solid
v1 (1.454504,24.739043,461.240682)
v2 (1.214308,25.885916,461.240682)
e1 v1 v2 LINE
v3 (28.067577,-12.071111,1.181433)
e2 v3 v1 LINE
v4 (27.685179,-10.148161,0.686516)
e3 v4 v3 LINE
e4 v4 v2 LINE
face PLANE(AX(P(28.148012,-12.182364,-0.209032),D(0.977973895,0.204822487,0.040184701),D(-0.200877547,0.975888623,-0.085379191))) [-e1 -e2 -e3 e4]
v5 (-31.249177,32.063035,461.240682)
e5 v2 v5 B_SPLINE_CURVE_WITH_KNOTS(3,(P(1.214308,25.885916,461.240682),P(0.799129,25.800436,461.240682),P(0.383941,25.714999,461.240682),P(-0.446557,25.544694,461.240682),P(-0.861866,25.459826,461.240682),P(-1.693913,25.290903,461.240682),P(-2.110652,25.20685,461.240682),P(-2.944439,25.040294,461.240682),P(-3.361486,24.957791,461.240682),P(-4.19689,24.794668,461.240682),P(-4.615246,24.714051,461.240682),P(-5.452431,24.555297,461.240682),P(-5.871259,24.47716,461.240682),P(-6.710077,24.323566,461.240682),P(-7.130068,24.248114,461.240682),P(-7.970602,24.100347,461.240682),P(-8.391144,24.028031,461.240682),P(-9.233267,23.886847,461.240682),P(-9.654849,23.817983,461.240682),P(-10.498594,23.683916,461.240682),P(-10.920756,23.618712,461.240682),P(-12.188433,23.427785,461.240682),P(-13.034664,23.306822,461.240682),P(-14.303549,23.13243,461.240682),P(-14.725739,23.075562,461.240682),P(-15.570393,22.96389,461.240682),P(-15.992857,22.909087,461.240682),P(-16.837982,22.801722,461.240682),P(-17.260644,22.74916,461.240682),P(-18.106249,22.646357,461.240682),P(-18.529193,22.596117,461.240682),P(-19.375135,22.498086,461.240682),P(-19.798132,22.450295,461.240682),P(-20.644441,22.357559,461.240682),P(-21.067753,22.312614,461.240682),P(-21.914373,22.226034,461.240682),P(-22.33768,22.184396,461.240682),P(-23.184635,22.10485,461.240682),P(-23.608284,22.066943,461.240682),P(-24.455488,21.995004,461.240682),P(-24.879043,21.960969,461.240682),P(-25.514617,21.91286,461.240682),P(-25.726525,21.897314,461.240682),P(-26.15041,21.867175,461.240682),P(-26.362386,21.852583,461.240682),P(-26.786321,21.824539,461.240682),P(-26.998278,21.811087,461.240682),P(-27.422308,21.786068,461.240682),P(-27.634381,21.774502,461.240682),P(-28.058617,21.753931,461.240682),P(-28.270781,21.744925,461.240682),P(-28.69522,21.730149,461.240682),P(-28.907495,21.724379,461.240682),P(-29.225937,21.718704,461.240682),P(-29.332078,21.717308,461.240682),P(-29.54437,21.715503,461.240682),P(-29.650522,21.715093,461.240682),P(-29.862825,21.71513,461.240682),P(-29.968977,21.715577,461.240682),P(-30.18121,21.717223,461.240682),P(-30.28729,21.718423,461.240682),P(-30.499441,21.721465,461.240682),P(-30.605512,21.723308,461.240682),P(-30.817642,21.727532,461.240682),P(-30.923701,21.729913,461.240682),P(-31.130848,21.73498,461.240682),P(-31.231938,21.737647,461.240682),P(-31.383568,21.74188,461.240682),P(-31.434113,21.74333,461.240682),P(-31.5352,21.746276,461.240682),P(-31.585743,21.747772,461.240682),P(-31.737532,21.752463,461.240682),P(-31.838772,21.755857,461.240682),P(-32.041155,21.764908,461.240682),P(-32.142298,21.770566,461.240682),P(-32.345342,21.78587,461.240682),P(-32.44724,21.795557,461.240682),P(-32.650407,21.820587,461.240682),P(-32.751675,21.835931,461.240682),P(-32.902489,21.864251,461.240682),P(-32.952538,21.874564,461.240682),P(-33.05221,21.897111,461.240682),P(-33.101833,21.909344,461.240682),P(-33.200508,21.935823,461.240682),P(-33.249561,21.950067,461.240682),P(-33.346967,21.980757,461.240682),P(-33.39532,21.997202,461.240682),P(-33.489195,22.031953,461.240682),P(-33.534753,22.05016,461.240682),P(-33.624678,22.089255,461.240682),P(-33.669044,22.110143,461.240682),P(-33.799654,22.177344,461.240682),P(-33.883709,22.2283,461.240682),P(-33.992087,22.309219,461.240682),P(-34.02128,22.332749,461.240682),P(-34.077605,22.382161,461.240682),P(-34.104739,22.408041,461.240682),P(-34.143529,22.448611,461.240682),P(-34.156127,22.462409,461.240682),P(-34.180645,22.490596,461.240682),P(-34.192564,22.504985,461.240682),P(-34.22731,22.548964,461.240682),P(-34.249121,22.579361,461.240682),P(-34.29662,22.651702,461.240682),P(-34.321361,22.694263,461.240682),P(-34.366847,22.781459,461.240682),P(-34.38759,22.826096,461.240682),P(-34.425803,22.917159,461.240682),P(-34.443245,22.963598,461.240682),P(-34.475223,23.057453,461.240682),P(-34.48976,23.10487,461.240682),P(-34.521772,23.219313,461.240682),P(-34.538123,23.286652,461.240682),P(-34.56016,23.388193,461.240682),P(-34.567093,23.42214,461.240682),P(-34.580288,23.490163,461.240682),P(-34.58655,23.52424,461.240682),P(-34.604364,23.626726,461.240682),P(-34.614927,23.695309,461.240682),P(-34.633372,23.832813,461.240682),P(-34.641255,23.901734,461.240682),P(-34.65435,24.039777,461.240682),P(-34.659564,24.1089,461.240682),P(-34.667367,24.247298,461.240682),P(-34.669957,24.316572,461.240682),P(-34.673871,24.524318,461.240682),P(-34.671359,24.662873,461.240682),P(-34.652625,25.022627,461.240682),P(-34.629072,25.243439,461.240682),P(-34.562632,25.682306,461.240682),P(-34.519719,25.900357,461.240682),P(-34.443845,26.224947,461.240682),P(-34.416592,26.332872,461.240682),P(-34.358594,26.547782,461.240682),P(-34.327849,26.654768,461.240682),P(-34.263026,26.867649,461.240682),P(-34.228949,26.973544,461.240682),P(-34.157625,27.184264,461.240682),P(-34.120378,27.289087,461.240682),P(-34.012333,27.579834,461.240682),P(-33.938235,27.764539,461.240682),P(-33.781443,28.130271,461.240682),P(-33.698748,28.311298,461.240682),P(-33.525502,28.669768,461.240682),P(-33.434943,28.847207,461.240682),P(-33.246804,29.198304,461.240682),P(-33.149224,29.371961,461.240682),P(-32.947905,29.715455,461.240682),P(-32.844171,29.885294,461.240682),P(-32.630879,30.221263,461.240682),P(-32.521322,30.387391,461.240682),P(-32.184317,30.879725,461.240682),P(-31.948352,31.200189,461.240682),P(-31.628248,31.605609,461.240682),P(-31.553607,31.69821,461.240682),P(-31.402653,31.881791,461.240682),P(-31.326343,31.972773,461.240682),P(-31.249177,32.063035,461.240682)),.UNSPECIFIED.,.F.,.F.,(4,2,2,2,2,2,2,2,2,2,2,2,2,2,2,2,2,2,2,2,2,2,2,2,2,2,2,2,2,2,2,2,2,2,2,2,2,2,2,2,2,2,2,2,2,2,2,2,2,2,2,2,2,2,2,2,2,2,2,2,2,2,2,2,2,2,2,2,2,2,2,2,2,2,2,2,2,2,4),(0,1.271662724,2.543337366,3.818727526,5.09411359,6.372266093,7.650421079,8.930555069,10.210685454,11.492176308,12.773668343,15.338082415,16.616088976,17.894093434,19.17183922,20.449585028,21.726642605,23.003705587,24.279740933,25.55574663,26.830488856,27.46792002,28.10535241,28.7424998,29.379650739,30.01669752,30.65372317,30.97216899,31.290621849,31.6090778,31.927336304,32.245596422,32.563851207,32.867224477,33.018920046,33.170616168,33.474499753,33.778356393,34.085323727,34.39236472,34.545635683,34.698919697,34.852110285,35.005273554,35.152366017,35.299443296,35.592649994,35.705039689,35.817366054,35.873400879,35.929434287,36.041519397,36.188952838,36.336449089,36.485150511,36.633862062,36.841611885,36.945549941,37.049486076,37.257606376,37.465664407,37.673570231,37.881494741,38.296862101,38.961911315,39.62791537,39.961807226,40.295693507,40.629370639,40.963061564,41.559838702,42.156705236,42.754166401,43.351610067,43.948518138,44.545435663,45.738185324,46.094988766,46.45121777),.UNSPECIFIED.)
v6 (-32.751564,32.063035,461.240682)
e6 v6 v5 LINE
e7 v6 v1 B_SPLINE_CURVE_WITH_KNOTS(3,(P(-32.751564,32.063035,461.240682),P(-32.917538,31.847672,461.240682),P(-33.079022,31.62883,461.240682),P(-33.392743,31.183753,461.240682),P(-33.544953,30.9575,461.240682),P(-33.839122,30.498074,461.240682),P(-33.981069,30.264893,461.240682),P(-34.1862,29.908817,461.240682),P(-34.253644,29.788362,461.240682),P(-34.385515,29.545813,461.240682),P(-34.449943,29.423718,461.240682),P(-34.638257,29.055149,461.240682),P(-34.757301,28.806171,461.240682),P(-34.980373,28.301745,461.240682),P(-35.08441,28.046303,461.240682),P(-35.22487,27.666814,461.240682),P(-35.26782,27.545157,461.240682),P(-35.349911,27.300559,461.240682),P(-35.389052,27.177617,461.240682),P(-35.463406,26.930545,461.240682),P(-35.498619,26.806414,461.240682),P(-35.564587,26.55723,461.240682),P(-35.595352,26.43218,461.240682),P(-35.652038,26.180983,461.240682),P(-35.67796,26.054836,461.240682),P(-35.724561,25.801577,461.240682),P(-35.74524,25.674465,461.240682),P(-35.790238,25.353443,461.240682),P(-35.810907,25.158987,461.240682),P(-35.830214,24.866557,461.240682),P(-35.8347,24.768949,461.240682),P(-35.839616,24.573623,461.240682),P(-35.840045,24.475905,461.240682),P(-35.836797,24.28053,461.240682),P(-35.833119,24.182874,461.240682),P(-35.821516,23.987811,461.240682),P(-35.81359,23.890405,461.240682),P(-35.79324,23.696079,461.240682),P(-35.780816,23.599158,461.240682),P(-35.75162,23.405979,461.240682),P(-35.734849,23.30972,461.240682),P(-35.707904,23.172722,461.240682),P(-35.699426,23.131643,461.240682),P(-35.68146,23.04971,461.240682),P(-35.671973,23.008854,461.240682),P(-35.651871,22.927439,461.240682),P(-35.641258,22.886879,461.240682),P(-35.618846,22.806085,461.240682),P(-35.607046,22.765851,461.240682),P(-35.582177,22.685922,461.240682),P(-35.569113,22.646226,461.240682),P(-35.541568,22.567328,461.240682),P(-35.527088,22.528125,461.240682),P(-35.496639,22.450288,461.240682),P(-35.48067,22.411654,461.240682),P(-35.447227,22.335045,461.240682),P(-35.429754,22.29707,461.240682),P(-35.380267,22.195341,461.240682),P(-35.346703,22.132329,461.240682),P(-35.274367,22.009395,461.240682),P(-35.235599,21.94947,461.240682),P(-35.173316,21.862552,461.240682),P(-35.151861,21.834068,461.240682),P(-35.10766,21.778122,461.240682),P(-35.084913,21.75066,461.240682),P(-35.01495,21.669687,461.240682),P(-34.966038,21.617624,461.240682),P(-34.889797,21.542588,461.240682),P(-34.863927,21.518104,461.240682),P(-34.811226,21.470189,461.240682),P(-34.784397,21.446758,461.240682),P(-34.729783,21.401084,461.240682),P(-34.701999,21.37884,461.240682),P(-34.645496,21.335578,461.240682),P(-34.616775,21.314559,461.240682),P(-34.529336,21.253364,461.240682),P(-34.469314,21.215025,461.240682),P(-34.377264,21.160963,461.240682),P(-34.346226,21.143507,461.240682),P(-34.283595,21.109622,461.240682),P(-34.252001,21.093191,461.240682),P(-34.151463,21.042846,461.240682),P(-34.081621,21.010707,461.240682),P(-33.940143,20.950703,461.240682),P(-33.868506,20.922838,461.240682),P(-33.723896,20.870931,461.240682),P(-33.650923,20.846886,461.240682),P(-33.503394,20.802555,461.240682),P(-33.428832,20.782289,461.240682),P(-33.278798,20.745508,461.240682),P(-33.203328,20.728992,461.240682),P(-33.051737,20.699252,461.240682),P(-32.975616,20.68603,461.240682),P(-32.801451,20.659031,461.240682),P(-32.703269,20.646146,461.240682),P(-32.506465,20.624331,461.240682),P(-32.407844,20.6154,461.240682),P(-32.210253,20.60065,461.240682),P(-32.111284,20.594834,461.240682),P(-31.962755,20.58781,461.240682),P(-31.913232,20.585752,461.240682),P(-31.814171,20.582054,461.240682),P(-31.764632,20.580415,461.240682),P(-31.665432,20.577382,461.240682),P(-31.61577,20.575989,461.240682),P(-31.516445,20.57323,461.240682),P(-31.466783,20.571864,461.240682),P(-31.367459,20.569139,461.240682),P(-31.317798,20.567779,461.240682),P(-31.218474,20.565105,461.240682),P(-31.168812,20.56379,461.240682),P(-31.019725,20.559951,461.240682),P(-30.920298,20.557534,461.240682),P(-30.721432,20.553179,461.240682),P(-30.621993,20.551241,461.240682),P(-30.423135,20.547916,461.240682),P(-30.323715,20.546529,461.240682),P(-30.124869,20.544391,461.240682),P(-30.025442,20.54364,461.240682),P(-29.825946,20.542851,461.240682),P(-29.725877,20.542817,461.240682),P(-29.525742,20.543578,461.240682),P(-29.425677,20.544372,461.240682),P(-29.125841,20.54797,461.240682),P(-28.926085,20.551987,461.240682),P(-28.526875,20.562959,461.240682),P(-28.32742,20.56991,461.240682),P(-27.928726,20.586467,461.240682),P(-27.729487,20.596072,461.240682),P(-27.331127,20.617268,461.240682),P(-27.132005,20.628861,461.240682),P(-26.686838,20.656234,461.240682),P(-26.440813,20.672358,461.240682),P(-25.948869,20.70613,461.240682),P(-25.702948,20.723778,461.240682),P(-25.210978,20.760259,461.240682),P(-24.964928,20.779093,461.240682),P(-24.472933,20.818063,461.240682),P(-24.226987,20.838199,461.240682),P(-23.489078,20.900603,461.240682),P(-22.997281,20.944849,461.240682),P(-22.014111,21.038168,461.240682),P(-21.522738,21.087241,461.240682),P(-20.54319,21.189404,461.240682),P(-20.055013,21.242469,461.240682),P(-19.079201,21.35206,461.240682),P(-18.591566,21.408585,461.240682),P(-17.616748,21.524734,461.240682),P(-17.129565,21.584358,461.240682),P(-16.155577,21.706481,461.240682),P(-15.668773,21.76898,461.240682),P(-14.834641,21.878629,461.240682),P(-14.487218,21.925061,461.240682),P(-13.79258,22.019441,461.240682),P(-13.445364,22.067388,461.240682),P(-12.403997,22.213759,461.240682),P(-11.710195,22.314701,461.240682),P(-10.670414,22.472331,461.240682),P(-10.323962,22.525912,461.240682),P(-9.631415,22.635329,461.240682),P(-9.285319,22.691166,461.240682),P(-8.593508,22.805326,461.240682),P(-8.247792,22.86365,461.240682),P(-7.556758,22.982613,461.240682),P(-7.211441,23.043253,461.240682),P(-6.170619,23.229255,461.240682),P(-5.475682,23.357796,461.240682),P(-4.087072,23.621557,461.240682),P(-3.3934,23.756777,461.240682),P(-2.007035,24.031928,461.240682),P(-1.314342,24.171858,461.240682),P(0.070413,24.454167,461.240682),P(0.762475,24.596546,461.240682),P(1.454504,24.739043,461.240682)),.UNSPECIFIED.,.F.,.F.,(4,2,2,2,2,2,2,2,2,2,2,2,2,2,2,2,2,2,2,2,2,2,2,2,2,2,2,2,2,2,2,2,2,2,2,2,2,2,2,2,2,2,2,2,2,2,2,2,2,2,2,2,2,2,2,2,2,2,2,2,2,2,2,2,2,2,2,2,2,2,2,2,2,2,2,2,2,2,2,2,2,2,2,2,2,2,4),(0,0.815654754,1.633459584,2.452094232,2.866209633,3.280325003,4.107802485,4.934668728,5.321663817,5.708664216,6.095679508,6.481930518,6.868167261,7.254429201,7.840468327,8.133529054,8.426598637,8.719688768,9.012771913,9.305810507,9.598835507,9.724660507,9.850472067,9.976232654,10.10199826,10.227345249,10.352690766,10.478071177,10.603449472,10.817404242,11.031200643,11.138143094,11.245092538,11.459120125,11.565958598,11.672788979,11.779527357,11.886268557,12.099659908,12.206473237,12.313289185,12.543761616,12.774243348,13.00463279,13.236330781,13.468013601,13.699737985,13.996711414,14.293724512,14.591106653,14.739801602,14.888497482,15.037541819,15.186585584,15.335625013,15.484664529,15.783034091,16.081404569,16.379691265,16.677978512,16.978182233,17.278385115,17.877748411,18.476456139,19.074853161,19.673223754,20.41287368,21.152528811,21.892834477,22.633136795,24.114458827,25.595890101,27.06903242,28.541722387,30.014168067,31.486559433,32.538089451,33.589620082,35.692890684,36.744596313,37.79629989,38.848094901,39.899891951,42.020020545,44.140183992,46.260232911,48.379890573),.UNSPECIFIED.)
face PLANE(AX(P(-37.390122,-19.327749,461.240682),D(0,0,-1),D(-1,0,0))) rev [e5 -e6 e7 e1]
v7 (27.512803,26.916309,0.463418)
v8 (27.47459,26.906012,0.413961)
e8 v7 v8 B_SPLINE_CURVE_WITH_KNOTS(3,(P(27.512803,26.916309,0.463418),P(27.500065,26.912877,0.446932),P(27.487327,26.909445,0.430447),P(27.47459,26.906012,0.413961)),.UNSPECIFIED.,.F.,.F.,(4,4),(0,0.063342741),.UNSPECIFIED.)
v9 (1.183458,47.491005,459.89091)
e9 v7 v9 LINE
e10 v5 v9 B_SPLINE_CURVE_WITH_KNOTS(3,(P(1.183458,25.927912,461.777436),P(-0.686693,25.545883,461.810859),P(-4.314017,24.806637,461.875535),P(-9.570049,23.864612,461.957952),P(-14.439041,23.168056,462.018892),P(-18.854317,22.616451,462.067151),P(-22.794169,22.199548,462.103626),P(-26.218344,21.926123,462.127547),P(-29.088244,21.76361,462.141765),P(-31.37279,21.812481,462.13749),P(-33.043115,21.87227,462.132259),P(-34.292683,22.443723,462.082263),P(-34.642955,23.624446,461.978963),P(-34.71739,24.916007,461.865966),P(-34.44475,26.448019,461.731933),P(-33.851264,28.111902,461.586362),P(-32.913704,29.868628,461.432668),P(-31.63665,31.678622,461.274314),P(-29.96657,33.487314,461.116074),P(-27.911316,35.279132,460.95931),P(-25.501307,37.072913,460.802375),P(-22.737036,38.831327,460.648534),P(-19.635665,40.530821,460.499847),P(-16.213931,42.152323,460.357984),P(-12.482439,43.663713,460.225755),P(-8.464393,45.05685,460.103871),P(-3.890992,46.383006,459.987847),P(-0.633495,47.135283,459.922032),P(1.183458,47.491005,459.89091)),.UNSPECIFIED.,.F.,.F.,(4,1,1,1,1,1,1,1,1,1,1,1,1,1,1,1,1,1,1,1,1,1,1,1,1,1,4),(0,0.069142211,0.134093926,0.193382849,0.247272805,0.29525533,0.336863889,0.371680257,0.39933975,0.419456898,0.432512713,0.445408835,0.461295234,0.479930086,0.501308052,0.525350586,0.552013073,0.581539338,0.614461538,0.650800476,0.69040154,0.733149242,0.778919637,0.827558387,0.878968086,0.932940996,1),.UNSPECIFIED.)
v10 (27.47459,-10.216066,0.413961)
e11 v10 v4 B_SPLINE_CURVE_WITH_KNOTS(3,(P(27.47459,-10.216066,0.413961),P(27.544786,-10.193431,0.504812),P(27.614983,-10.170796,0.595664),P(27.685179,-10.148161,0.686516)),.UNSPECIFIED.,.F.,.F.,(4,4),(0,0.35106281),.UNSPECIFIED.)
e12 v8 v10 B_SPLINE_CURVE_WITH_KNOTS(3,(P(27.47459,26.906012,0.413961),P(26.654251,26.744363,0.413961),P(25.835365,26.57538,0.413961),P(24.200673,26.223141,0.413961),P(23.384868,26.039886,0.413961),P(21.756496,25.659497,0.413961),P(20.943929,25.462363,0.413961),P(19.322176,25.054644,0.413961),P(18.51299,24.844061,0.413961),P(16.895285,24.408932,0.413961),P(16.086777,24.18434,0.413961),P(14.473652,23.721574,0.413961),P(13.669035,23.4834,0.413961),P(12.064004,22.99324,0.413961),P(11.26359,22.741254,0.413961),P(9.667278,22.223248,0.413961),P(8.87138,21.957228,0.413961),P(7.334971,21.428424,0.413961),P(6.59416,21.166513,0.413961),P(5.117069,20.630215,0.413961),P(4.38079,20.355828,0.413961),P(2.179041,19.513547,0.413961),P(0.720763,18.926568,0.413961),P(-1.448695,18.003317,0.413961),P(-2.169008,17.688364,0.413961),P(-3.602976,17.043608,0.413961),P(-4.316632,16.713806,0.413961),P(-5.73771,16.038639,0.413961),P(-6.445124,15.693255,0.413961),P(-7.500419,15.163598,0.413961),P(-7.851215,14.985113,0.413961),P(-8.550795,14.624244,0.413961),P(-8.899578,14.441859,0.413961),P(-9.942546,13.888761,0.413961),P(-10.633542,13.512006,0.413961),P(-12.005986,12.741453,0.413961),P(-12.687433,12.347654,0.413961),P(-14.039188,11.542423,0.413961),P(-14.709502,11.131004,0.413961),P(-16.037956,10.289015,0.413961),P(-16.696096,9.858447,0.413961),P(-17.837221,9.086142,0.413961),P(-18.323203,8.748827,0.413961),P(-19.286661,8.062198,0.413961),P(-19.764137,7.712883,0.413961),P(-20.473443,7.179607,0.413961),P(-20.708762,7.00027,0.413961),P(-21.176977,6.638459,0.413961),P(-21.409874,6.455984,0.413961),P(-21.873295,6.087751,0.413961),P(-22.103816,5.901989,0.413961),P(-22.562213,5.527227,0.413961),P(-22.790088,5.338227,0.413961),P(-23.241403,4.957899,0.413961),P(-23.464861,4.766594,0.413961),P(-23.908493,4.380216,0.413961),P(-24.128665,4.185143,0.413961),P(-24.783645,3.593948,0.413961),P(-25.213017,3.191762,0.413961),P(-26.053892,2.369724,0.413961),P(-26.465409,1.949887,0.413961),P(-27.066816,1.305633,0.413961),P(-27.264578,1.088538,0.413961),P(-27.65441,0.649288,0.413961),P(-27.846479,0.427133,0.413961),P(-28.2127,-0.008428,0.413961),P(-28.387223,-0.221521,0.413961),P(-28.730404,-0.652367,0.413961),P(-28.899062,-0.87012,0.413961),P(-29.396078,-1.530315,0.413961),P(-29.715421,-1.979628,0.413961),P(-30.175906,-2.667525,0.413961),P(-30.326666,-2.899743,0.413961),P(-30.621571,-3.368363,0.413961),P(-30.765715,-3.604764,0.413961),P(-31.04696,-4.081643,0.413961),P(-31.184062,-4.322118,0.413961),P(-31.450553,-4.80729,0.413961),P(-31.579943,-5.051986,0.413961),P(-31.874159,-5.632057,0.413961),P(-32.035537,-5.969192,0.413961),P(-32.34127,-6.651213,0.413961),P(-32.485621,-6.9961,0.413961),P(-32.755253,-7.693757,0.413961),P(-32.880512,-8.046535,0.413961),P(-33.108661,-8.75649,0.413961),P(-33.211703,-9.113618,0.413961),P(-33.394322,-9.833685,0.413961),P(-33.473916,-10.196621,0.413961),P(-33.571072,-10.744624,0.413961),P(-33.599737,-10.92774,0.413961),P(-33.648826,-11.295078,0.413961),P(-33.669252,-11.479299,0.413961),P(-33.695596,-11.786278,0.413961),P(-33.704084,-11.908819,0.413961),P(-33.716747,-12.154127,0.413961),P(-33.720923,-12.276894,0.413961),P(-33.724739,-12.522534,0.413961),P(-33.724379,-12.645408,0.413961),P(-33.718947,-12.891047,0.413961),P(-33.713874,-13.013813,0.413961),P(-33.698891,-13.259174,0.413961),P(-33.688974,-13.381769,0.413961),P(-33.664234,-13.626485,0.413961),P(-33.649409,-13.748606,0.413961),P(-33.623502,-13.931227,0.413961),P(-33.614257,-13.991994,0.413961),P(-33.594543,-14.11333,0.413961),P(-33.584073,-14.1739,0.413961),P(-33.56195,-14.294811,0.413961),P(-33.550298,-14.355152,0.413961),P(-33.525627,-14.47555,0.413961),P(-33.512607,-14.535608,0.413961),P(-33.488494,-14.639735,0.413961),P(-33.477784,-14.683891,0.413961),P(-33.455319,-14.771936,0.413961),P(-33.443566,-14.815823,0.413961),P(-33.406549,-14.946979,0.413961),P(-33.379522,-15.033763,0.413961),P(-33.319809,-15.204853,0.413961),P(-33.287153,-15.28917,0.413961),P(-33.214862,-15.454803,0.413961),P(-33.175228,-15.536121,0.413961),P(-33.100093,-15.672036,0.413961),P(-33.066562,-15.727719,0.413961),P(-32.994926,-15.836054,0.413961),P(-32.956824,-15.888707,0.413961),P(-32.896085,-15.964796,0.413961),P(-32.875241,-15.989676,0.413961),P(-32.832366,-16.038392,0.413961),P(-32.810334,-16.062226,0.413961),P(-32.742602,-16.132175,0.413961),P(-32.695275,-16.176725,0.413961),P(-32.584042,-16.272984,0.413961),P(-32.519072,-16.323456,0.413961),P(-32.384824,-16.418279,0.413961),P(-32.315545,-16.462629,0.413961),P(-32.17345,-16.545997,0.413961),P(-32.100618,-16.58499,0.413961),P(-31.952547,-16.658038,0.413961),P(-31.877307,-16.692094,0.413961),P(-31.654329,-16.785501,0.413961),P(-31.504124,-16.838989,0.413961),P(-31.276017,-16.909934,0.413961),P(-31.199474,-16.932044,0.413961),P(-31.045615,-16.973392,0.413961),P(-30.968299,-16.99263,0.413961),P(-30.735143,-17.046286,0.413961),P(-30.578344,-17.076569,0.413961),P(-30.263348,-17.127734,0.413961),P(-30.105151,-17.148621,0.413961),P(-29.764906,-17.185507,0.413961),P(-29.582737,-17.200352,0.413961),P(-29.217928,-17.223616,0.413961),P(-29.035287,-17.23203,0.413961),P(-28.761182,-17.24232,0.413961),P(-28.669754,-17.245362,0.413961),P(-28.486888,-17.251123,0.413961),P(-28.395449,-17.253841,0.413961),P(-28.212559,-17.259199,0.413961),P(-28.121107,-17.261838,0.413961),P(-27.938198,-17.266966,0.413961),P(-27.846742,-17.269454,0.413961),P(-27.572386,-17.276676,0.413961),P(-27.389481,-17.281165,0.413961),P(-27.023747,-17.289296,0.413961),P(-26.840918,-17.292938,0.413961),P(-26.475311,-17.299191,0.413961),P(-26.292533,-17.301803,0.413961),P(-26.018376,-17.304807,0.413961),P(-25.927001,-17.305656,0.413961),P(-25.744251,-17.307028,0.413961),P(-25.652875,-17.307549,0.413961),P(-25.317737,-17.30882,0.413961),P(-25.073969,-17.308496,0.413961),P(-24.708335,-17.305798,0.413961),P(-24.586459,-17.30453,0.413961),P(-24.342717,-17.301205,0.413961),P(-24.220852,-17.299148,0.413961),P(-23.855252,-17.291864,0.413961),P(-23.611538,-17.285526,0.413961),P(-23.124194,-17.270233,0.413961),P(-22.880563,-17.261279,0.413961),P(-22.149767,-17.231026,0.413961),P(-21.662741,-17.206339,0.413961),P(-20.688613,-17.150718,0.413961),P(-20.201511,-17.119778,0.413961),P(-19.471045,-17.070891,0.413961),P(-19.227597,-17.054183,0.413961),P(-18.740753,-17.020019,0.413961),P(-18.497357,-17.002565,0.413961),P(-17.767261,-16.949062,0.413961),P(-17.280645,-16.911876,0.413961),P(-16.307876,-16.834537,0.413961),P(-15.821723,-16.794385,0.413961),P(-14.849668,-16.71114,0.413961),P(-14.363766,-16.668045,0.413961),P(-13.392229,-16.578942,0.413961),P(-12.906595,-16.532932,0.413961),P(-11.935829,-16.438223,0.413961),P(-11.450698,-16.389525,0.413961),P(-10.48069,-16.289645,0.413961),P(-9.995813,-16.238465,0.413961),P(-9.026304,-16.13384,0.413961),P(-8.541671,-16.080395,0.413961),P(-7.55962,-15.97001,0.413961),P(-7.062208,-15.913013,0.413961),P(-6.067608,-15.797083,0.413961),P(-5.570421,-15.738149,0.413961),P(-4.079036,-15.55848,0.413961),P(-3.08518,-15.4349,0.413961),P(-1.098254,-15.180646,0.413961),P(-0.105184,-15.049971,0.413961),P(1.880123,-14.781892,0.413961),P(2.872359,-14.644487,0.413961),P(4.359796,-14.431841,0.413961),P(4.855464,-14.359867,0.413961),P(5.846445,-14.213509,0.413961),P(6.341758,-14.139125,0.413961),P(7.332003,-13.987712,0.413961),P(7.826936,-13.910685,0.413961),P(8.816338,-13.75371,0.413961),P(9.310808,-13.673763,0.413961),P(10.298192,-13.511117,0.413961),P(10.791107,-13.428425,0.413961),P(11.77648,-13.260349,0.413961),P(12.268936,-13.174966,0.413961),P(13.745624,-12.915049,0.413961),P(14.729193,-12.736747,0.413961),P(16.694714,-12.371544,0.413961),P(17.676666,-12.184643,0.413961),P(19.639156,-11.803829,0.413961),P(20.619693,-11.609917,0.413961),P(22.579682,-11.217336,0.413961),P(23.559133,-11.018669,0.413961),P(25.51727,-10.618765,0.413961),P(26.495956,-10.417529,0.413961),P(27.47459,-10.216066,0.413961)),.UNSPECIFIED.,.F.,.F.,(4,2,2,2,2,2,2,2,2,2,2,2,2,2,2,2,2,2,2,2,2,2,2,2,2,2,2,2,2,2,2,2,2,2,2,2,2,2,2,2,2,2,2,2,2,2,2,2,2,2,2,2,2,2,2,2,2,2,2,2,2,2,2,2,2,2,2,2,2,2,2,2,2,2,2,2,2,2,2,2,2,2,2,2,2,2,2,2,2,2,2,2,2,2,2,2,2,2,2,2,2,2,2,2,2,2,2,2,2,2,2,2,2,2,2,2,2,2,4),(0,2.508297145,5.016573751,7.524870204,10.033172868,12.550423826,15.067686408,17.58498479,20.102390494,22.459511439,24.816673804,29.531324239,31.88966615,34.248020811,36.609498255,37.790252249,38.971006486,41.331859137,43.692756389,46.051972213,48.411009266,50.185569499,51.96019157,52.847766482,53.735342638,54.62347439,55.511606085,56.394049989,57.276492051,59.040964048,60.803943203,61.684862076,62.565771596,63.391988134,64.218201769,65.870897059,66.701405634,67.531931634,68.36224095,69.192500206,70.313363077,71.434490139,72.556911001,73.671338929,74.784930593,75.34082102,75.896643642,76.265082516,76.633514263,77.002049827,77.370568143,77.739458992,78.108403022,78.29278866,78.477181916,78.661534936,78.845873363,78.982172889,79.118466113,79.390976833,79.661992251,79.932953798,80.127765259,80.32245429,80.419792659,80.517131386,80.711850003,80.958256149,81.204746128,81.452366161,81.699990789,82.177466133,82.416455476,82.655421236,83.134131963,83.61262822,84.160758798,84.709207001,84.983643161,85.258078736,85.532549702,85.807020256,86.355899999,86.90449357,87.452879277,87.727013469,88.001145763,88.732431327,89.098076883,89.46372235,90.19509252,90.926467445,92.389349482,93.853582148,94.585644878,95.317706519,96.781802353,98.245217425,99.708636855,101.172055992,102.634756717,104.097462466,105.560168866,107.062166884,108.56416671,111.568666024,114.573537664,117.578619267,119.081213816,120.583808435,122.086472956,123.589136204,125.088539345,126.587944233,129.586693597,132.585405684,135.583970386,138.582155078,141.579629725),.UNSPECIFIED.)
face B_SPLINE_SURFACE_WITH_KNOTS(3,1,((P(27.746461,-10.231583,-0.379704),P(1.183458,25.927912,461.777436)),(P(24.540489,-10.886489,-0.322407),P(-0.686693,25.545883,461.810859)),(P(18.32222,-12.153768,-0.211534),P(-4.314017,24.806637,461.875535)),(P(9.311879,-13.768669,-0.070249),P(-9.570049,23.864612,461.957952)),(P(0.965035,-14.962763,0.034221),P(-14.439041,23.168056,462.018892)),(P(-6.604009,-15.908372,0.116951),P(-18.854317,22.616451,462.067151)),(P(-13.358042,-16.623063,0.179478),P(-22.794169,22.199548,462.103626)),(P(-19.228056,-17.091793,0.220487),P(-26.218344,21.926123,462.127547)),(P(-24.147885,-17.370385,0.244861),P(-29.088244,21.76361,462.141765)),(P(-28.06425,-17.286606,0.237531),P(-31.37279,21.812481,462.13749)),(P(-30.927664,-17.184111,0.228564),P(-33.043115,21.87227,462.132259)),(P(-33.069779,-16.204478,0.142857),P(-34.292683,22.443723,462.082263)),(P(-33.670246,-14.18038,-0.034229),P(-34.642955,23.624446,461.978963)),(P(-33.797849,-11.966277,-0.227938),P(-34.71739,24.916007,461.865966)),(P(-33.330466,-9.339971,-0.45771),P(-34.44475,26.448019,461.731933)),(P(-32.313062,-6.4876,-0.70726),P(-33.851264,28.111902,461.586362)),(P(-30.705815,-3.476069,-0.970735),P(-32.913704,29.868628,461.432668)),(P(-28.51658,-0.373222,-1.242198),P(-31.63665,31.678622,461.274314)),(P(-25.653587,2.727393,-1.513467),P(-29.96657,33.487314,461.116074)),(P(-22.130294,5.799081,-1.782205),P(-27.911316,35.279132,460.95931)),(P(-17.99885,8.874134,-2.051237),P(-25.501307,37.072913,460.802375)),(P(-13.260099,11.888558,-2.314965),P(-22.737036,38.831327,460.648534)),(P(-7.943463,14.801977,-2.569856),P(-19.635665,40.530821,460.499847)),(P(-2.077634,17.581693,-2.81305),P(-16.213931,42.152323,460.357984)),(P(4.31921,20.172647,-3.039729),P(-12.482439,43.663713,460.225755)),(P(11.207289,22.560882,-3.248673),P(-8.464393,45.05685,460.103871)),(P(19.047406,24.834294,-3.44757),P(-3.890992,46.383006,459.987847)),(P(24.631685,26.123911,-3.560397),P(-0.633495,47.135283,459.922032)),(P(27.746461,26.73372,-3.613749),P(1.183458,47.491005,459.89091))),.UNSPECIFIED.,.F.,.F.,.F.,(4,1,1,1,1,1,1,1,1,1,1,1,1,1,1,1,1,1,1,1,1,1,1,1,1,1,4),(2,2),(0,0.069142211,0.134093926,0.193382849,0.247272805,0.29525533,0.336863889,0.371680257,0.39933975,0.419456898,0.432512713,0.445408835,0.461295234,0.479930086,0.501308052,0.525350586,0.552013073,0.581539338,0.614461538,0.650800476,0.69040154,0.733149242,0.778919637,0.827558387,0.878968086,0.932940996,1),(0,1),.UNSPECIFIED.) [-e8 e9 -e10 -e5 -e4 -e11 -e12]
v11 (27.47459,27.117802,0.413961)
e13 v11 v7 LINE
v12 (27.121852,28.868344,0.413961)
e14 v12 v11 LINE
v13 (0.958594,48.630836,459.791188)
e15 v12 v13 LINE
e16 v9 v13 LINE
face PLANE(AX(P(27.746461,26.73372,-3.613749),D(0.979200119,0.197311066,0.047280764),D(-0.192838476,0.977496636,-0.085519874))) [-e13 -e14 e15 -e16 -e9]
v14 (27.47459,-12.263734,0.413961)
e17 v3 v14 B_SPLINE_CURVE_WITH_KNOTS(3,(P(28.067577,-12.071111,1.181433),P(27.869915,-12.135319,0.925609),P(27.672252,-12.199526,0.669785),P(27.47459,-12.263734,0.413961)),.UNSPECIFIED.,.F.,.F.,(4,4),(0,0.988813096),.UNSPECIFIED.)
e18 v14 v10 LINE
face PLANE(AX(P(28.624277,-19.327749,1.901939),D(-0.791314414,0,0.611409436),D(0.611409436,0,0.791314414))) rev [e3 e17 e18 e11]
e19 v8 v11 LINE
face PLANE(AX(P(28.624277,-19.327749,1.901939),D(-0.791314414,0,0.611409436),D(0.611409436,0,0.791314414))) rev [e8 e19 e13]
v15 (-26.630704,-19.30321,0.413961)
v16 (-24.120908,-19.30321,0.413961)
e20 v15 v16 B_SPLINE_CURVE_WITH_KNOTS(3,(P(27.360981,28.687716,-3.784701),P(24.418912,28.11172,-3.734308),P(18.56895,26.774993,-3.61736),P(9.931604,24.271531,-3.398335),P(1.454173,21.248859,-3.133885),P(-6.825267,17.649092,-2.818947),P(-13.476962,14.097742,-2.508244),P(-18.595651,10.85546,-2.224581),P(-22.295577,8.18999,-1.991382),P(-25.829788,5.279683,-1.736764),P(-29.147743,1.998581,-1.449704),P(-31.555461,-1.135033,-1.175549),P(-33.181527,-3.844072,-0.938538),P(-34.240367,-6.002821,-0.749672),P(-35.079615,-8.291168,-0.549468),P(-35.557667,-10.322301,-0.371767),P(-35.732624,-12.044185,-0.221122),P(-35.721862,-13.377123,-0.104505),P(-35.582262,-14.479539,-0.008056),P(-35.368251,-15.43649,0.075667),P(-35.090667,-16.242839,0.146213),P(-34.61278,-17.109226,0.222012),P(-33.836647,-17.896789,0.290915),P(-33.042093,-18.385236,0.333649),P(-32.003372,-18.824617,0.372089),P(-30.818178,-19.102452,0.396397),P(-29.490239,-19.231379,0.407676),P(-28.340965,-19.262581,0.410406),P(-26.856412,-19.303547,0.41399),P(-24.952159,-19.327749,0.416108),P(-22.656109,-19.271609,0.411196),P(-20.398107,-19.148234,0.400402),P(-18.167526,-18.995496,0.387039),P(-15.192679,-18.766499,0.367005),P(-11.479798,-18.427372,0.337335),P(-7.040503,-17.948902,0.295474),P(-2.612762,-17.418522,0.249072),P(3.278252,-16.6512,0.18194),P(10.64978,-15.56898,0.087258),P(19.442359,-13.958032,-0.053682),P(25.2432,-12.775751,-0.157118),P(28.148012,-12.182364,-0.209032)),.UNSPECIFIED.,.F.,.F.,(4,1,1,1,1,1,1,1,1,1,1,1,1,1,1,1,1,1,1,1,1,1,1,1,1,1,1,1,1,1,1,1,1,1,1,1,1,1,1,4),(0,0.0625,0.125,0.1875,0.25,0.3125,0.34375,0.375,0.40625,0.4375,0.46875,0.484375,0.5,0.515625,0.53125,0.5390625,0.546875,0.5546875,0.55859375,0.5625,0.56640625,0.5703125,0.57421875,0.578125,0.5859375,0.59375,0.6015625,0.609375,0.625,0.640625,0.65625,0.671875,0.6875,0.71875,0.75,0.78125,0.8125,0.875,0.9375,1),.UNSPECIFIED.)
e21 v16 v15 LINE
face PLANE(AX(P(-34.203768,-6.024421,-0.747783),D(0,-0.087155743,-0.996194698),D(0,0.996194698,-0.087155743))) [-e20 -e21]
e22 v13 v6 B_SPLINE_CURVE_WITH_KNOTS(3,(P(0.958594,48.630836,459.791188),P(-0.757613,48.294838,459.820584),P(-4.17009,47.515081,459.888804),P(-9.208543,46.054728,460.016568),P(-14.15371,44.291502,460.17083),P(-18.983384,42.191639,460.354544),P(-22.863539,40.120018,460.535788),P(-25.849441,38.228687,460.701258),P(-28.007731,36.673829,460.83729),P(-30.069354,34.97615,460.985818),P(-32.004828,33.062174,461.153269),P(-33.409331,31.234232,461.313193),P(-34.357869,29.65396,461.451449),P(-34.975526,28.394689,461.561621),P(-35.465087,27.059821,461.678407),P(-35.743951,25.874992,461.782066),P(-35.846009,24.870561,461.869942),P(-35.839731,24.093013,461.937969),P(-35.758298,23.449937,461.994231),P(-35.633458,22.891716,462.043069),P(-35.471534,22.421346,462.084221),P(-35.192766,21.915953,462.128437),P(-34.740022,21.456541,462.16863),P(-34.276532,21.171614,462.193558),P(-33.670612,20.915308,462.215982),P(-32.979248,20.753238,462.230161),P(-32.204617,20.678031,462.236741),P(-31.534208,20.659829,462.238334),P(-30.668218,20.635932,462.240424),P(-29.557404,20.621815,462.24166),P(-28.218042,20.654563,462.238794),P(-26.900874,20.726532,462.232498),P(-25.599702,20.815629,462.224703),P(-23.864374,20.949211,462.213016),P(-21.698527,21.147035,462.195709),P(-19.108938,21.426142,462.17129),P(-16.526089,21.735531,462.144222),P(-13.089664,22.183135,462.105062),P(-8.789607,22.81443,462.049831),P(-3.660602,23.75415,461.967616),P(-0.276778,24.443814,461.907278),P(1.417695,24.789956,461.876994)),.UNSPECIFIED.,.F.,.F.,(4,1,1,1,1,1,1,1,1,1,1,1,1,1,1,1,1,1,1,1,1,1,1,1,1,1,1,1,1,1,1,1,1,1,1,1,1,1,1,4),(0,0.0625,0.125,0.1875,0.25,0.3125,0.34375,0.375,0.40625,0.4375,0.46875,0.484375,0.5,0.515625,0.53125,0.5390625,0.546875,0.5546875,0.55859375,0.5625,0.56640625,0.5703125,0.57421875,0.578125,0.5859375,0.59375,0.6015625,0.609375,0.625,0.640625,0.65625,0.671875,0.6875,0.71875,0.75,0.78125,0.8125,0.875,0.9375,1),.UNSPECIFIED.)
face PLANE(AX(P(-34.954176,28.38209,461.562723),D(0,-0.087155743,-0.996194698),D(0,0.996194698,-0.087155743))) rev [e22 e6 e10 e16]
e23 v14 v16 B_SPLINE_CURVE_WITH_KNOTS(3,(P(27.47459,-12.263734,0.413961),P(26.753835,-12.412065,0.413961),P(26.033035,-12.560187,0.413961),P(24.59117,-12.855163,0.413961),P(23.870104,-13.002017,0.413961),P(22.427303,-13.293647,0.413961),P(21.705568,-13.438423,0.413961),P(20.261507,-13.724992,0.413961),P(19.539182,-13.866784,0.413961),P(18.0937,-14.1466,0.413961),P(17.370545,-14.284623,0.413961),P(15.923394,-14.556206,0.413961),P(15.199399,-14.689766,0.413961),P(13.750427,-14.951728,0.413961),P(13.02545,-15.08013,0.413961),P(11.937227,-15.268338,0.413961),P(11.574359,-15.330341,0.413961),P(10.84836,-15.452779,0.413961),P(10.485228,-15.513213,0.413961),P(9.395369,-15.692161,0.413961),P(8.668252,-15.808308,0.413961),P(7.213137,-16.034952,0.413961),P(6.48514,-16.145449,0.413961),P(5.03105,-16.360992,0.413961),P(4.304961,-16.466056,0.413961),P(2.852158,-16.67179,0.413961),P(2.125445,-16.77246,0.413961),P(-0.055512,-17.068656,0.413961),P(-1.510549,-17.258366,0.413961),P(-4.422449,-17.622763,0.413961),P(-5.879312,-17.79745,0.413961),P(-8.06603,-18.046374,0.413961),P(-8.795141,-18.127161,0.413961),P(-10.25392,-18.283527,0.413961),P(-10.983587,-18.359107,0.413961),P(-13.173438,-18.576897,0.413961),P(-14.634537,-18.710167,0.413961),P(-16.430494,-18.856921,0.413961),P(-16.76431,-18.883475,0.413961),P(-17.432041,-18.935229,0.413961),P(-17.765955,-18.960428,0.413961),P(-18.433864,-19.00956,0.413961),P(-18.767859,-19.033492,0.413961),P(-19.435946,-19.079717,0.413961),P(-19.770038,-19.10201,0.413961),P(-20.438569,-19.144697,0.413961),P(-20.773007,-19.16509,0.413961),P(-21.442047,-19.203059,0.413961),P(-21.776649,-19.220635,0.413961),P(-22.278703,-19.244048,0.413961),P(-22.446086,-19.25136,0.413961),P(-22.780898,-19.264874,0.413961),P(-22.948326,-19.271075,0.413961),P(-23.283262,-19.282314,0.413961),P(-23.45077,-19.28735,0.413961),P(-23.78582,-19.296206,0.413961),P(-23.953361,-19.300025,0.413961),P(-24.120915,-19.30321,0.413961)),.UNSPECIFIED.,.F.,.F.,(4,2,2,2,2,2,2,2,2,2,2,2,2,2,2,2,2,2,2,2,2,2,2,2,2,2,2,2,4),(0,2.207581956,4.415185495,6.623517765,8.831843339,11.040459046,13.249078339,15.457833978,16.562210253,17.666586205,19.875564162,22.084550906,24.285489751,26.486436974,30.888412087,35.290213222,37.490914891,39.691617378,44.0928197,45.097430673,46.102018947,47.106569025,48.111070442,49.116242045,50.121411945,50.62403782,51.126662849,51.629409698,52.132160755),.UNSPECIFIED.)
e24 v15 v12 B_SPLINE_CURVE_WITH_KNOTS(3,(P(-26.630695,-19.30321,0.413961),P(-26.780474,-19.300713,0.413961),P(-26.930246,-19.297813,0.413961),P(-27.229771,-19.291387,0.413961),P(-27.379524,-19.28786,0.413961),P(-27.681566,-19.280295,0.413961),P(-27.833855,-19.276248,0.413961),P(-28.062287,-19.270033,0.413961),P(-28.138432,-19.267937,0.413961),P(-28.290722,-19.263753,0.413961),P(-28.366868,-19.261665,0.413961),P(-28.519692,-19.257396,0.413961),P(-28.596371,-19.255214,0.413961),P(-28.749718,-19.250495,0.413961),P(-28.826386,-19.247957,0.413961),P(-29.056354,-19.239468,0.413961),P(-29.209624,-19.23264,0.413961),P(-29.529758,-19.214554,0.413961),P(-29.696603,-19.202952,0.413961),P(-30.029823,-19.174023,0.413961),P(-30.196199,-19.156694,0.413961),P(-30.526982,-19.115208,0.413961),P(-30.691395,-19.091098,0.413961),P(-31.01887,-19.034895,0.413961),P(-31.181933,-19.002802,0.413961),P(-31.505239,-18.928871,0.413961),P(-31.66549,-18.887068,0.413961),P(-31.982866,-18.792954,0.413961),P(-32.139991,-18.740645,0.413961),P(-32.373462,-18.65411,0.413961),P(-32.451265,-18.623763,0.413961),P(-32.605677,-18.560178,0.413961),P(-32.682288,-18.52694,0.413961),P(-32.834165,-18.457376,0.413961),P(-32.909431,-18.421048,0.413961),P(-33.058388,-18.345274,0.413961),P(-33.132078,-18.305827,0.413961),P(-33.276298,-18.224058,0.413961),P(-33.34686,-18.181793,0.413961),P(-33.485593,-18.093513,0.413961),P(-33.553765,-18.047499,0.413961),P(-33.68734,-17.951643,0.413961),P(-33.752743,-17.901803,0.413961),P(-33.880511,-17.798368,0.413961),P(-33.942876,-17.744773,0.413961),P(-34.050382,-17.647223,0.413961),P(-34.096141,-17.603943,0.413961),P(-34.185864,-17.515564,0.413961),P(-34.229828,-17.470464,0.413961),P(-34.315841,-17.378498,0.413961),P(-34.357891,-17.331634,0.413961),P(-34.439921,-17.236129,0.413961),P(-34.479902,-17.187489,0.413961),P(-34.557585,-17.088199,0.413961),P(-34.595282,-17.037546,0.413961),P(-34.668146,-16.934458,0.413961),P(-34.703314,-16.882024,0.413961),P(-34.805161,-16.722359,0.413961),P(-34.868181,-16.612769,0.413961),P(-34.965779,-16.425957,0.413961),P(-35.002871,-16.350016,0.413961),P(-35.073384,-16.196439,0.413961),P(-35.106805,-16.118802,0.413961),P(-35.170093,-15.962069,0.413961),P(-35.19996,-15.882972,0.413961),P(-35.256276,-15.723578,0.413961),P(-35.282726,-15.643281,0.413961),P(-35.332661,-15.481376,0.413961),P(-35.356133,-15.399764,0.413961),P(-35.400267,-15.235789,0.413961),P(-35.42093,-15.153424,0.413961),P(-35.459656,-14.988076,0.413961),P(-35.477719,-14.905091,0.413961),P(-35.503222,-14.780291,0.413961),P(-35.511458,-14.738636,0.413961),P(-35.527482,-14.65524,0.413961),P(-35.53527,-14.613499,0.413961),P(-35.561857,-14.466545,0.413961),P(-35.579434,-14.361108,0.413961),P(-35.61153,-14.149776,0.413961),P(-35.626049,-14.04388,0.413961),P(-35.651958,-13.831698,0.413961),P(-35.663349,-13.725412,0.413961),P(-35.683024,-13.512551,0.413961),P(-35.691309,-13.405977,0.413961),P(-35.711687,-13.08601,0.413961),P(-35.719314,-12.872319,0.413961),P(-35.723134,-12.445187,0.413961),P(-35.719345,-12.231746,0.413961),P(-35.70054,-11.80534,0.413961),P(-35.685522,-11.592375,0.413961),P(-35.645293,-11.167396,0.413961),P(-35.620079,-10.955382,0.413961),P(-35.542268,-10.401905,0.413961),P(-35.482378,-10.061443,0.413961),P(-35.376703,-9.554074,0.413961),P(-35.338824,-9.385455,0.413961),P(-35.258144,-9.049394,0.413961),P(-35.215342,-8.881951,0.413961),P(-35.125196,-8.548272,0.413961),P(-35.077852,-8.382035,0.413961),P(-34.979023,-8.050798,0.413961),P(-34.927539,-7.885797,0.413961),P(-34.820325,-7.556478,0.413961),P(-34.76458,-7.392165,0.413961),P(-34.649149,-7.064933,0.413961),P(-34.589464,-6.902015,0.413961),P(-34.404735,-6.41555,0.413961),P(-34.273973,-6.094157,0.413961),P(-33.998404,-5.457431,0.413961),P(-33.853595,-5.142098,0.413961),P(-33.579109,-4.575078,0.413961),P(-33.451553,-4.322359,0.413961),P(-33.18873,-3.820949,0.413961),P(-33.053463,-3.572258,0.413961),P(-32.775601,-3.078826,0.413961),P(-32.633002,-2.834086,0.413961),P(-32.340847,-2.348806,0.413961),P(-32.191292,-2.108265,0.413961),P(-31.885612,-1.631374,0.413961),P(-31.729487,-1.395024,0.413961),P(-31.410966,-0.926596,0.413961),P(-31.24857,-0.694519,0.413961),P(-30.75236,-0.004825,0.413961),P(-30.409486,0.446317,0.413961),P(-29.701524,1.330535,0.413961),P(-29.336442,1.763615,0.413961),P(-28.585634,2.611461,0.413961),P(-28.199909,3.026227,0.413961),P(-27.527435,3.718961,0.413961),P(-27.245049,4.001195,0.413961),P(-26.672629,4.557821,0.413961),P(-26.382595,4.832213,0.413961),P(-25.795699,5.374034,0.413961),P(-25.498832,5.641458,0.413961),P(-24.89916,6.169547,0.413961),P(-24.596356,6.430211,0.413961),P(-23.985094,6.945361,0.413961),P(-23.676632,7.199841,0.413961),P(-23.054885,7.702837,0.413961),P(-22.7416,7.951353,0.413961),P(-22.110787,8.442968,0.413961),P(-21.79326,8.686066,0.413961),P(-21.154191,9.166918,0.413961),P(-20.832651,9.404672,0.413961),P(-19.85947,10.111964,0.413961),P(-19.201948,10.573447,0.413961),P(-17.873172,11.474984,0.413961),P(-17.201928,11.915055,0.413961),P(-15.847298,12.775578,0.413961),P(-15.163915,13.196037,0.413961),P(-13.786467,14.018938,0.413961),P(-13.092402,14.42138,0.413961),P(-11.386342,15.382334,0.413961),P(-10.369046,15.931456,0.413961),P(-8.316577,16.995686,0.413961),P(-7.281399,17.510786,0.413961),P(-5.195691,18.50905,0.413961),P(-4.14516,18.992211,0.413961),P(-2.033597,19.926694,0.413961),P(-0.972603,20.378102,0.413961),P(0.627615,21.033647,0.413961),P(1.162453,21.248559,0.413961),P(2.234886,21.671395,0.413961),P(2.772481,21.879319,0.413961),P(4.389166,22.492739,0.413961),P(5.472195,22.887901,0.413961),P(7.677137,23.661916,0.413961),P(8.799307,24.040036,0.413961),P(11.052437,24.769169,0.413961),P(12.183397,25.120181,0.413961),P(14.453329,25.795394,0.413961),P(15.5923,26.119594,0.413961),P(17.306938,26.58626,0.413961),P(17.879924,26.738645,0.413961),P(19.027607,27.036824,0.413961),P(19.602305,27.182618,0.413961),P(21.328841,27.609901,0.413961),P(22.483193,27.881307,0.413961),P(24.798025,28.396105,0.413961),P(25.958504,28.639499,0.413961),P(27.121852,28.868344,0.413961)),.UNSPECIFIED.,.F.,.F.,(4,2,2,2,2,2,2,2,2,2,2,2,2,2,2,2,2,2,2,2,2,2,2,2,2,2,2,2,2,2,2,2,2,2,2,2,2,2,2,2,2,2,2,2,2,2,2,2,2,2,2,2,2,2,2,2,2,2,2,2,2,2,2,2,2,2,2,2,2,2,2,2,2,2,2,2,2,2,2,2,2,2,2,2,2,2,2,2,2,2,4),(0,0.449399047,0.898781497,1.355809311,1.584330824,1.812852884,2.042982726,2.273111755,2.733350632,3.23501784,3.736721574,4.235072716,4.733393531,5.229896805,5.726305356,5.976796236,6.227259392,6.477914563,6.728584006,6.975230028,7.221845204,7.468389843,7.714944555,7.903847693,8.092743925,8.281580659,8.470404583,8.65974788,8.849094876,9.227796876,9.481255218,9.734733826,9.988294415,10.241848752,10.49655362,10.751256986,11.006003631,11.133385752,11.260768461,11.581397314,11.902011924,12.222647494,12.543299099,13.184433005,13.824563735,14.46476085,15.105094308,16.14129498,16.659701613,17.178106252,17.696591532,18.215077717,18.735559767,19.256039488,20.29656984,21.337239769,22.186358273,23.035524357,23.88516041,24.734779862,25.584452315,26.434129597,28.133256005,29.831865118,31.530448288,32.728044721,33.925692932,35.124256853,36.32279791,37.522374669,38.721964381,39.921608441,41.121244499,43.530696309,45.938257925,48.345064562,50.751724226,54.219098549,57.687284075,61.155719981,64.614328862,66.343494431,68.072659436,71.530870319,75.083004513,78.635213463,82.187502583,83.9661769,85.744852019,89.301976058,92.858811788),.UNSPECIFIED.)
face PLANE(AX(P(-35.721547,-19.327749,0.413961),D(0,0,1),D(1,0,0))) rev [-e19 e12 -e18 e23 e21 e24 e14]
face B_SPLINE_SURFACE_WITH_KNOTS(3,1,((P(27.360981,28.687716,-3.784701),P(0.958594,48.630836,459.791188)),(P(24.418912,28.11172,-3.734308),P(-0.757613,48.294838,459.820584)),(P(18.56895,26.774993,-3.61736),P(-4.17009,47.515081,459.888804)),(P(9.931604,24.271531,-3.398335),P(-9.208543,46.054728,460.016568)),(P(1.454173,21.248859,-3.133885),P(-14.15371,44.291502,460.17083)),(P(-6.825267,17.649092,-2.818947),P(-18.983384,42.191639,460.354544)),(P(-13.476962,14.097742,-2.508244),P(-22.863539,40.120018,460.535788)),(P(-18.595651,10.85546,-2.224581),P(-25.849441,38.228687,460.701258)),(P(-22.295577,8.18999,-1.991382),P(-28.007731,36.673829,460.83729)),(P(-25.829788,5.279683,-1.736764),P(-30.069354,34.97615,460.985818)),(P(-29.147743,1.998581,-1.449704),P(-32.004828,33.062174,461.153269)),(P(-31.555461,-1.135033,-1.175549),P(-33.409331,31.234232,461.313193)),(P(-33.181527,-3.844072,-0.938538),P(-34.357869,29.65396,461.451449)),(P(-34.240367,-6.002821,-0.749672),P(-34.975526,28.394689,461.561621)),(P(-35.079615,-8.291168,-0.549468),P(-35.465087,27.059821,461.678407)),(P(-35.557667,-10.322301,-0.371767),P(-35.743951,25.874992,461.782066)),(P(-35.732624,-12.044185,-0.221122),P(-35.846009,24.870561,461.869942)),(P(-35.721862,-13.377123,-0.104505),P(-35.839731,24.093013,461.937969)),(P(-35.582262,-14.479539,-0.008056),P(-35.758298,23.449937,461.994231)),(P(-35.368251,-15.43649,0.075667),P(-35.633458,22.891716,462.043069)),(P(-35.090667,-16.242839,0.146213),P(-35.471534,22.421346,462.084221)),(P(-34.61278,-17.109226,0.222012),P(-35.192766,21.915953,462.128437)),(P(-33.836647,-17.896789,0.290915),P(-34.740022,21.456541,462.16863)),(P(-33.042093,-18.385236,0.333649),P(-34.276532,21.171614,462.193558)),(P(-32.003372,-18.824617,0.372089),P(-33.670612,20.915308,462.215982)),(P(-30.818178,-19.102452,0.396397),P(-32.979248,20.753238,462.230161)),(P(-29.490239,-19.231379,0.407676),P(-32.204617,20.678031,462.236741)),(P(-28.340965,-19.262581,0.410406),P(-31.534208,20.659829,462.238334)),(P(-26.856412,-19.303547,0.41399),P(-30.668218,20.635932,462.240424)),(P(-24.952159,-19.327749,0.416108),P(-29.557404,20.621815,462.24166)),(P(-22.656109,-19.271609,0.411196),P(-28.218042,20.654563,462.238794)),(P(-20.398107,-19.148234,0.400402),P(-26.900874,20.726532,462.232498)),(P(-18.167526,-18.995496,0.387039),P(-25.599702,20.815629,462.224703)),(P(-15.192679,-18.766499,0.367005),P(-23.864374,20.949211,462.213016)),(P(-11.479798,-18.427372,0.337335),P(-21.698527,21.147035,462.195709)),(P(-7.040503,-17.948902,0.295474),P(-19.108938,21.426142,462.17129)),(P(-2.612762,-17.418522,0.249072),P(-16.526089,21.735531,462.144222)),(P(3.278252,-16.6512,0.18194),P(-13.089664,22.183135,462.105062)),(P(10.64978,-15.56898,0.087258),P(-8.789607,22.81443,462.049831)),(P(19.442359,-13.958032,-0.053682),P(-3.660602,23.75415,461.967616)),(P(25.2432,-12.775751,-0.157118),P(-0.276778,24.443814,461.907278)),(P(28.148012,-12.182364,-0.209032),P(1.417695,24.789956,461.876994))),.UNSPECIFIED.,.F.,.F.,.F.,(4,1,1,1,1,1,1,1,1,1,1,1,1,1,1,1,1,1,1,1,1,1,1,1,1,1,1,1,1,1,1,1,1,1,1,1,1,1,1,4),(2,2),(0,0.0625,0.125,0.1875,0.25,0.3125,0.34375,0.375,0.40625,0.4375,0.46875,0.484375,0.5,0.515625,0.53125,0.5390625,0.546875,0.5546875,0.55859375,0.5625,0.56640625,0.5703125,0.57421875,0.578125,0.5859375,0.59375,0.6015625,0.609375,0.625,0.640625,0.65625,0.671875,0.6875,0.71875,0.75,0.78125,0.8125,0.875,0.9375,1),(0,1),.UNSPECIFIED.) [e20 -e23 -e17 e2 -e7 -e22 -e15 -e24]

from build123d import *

# Parameters (mm, degrees)
CUT_EXTRUDE5_DEPTH      = 467.171820203
CUT_EXTRUDE5_DEPTH_BACK = 467.171820203


with BuildPart() as part:
    # Boundary1: read off the stored shape, not the designer's step
    # Boundary1: loft between two sections, ruled curve by curve
    boundary1_from = [
        Edge.make_bspline([(27.746461368, -10.231582557, -0.37970371), (24.54048865, -10.88648923, -0.3224068), (18.322219711, -12.153767625, -0.211534307), (9.311879161, -13.768668652, -0.070248775), (0.965035467, -14.962763473, 0.034220985), (-6.604009298, -15.908371944, 0.116951007), (-13.358041741, -16.623063146, 0.179478385), (-19.228055617, -17.091792561, 0.220486895), (-24.147885132, -17.37038488, 0.244860564), (-28.064249619, -17.286606019, 0.237530864), (-30.927663742, -17.184111401, 0.228563747), (-33.069779251, -16.204477975, 0.142856927), (-33.670245564, -14.180380357, -0.034228668), (-33.79784861, -11.966277347, -0.227937581), (-33.330465654, -9.339970934, -0.457709619), (-32.313062195, -6.487599721, -0.707259765), (-30.705815178, -3.476068737, -0.970734586), (-28.516579872, -0.373222201, -1.242198482), (-25.653586837, 2.727393202, -1.51346718), (-22.130293772, 5.79908064, -1.782205009), (-17.998850338, 8.874134437, -2.051237356), (-13.260099319, 11.888557643, -2.314965213), (-7.943462931, 14.801976598, -2.569856344), (-2.077633941, 17.581693253, -2.813050039), (4.319210231, 20.172647346, -3.03972915), (11.207289388, 22.560882395, -3.248672642), (19.047405598, 24.834293744, -3.447570363), (24.631685242, 26.123911427, -3.560397291), (27.746461368, 26.733720257, -3.61374865)], [0, 0, 0, 0, 0.069142211, 0.134093926, 0.193382849, 0.247272805, 0.29525533, 0.336863889, 0.371680257, 0.39933975, 0.419456898, 0.432512713, 0.445408835, 0.461295234, 0.479930086, 0.501308052, 0.525350586, 0.552013073, 0.581539338, 0.614461538, 0.650800476, 0.69040154, 0.733149242, 0.778919637, 0.827558387, 0.878968086, 0.932940996, 1, 1, 1, 1], 3),
        Edge.make_bspline([(27.360981111, 28.687716483, -3.784701168), (24.418912176, 28.111720153, -3.734308019), (18.568950334, 26.774993221, -3.617359566), (9.931603873, 24.271530826, -3.398334987), (1.454173497, 21.248858509, -3.133885426), (-6.825266824, 17.649092208, -2.818946683), (-13.476961936, 14.097742153, -2.508243813), (-18.595650936, 10.855460073, -2.224580887), (-22.295577191, 8.189990235, -1.991382494), (-25.829788091, 5.2796825, -1.736763559), (-29.147742681, 1.998580964, -1.449704371), (-31.555461477, -1.135032916, -1.175548681), (-33.181527352, -3.844071716, -0.938538497), (-34.240367025, -6.002821132, -0.749672395), (-35.079614705, -8.291167612, -0.54946802), (-35.557667228, -10.322301427, -0.371766837), (-35.732624245, -12.044184646, -0.221121576), (-35.721862376, -13.37712306, -0.104504575), (-35.582262474, -14.479538884, -0.008055688), (-35.368251029, -15.436490393, 0.07566672), (-35.0906666, -16.242838807, 0.146213065), (-34.612779787, -17.109226433, 0.222012161), (-33.836646855, -17.896788857, 0.290914945), (-33.042092756, -18.3852358, 0.333648515), (-32.003372281, -18.824617033, 0.372089392), (-30.818177722, -19.102451519, 0.39639676), (-29.490238689, -19.231378803, 0.407676436), (-28.340965262, -19.26258139, 0.410406308), (-26.85641179, -19.303547365, 0.413990367), (-24.952158992, -19.327749266, 0.416107759), (-22.656109383, -19.271609205, 0.41119614), (-20.398107438, -19.14823427, 0.400402231), (-18.167525907, -18.995496212, 0.387039383), (-15.192679466, -18.766498595, 0.367004687), (-11.479797979, -18.427372101, 0.337334964), (-7.040502934, -17.948902242, 0.295474275), (-2.6127621, -17.418521591, 0.249071981), (3.278252149, -16.651200192, 0.181940057), (10.649779589, -15.568979876, 0.087258048), (19.442358508, -13.958032163, -0.053681614), (25.243200231, -12.775750709, -0.157117839), (28.148011567, -12.182364396, -0.209032414)], [0, 0, 0, 0, 0.0625, 0.125, 0.1875, 0.25, 0.3125, 0.34375, 0.375, 0.40625, 0.4375, 0.46875, 0.484375, 0.5, 0.515625, 0.53125, 0.5390625, 0.546875, 0.5546875, 0.55859375, 0.5625, 0.56640625, 0.5703125, 0.57421875, 0.578125, 0.5859375, 0.59375, 0.6015625, 0.609375, 0.625, 0.640625, 0.65625, 0.671875, 0.6875, 0.71875, 0.75, 0.78125, 0.8125, 0.875, 0.9375, 1, 1, 1, 1], 3),
        Edge.make_line((28.148011567, -12.182364396, -0.209032414), (27.746461368, -10.231582557, -0.37970371)),
        Edge.make_line((27.746461368, 26.733720257, -3.61374865), (27.360981111, 28.687716483, -3.784701168)),
    ]
    boundary1_to = [
        Edge.make_bspline([(1.183457689, 25.927911818, 461.777436147), (-0.686693063, 25.545882925, 461.810859344), (-4.314016611, 24.806637194, 461.875534965), (-9.570048598, 23.864611595, 461.957951526), (-14.439040753, 23.168056283, 462.018892219), (-18.854316866, 22.616451342, 462.067151398), (-22.794169125, 22.199548141, 462.103625702), (-26.218343885, 21.926122649, 462.127547333), (-29.088244436, 21.763610462, 462.141765307), (-31.372790386, 21.812481465, 462.137489648), (-33.043115292, 21.872269991, 462.13225883), (-34.292682672, 22.443722824, 462.082263185), (-34.642954688, 23.624446434, 461.978963255), (-34.717389798, 24.916006523, 461.865966388), (-34.44474974, 26.448018598, 461.7319327), (-33.851264389, 28.111901805, 461.586361781), (-32.913703629, 29.868628212, 461.432668136), (-31.636649701, 31.678622025, 461.274314196), (-29.96657043, 33.487314343, 461.116074123), (-27.911316142, 35.279132015, 460.959310389), (-25.501307472, 37.072913397, 460.802374853), (-22.737036045, 38.831326934, 460.648533603), (-19.635664819, 40.530821325, 460.49984711), (-16.213931241, 42.152322706, 460.357984121), (-12.482438807, 43.663712594, 460.22575464), (-8.464392632, 45.056849706, 460.103870936), (-3.89099151, 46.383006326, 459.987847266), (-0.633495051, 47.135283308, 459.922031558), (1.183457689, 47.491005126, 459.890909932)], [0, 0, 0, 0, 0.069142211, 0.134093926, 0.193382849, 0.247272805, 0.29525533, 0.336863889, 0.371680257, 0.39933975, 0.419456898, 0.432512713, 0.445408835, 0.461295234, 0.479930086, 0.501308052, 0.525350586, 0.552013073, 0.581539338, 0.614461538, 0.650800476, 0.69040154, 0.733149242, 0.778919637, 0.827558387, 0.878968086, 0.932940996, 1, 1, 1, 1], 3),
        Edge.make_bspline([(0.958594206, 48.630836257, 459.791187629), (-0.757612673, 48.294838398, 459.820583633), (-4.170090414, 47.515081021, 459.888803564), (-9.208542516, 46.054727957, 460.016567902), (-14.153710236, 44.291502439, 460.170830146), (-18.983383756, 42.191638763, 460.354544412), (-22.863539238, 40.120017898, 460.535787753), (-25.849441155, 38.228686685, 460.701257793), (-28.00773147, 36.673829279, 460.83729019), (-30.069354495, 34.976149767, 460.985817901), (-32.004828006, 33.062173871, 461.153269094), (-33.409330637, 31.234232441, 461.313193247), (-34.357869064, 29.653959808, 461.451449188), (-34.97552554, 28.394689315, 461.56162108), (-35.465086687, 27.059820535, 461.678406966), (-35.743950659, 25.874992476, 461.782065989), (-35.846008918, 24.870560599, 461.869942392), (-35.839731162, 24.093013191, 461.937968975), (-35.758297885, 23.449937293, 461.994230826), (-35.633457875, 22.89171558, 462.043068898), (-35.471533625, 22.421345671, 462.084220932), (-35.192766318, 21.91595289, 462.128437071), (-34.740022107, 21.456541476, 462.168630362), (-34.276532216, 21.171614092, 462.193558278), (-33.67061194, 20.915308373, 462.215982123), (-32.979248447, 20.753238256, 462.230161421), (-32.204617344, 20.678030674, 462.236741232), (-31.534207845, 20.659829165, 462.238333657), (-30.668218319, 20.635932346, 462.240424358), (-29.557404187, 20.62181457, 462.241659503), (-28.218041916, 20.654562939, 462.238794392), (-26.900874114, 20.726531652, 462.232497946), (-25.599701555, 20.815628852, 462.224702951), (-23.864374464, 20.949210795, 462.213016045), (-21.69852693, 21.147034583, 462.195708706), (-19.108938154, 21.426142001, 462.171289971), (-16.526089334, 21.735530714, 462.144221966), (-13.089664355, 22.183134864, 462.105061678), (-8.789606682, 22.814430048, 462.049830506), (-3.660602312, 23.754149547, 461.967615702), (-0.276777974, 24.443813728, 461.907277905), (1.417695305, 24.789955744, 461.876994403)], [0, 0, 0, 0, 0.0625, 0.125, 0.1875, 0.25, 0.3125, 0.34375, 0.375, 0.40625, 0.4375, 0.46875, 0.484375, 0.5, 0.515625, 0.53125, 0.5390625, 0.546875, 0.5546875, 0.55859375, 0.5625, 0.56640625, 0.5703125, 0.57421875, 0.578125, 0.5859375, 0.59375, 0.6015625, 0.609375, 0.625, 0.640625, 0.65625, 0.671875, 0.6875, 0.71875, 0.75, 0.78125, 0.8125, 0.875, 0.9375, 1, 1, 1, 1], 3),
        Edge.make_line((1.417695305, 24.789955744, 461.876994403), (1.183457689, 25.927911818, 461.777436147)),
        Edge.make_line((1.183457689, 47.491005126, 459.890909932), (0.958594206, 48.630836257, 459.791187629)),
    ]
    boundary1 = Solid(Shell([*[Face.make_surface_from_curves(boundary1_from[k], boundary1_to[k]) for k in range(4)], Face(Wire(boundary1_from)), Face(Wire(boundary1_to))]))
    add(boundary1)

    # Sketch5 → Cut-Extrude5 (cut, two sides: drawn at the far end of the back side and taken through both)
    with BuildSketch(Plane(origin=(0, 0, 0), x_dir=(1, 0, 0), z_dir=(0, 1, 0)).offset(-CUT_EXTRUDE5_DEPTH_BACK)):
        Polygon((-35.721546653, -0.413960836), (27.474589662, -0.413960836), (28.624276546, -1.901938856), (28.624276546, 5.514944665), (-37.390121525, 5.514944665), (-37.390121525, -0.413960836), align=None)
        Polygon((-35.721546653, -467.169587901), (27.474589662, -467.169587901), (28.624276546, -468.657565921), (28.624276546, -461.2406824), (-37.390121525, -461.2406824), (-37.390121525, -467.169587901), align=None)
    extrude(amount=CUT_EXTRUDE5_DEPTH + CUT_EXTRUDE5_DEPTH_BACK, mode=Mode.SUBTRACT)


solid = part.part
